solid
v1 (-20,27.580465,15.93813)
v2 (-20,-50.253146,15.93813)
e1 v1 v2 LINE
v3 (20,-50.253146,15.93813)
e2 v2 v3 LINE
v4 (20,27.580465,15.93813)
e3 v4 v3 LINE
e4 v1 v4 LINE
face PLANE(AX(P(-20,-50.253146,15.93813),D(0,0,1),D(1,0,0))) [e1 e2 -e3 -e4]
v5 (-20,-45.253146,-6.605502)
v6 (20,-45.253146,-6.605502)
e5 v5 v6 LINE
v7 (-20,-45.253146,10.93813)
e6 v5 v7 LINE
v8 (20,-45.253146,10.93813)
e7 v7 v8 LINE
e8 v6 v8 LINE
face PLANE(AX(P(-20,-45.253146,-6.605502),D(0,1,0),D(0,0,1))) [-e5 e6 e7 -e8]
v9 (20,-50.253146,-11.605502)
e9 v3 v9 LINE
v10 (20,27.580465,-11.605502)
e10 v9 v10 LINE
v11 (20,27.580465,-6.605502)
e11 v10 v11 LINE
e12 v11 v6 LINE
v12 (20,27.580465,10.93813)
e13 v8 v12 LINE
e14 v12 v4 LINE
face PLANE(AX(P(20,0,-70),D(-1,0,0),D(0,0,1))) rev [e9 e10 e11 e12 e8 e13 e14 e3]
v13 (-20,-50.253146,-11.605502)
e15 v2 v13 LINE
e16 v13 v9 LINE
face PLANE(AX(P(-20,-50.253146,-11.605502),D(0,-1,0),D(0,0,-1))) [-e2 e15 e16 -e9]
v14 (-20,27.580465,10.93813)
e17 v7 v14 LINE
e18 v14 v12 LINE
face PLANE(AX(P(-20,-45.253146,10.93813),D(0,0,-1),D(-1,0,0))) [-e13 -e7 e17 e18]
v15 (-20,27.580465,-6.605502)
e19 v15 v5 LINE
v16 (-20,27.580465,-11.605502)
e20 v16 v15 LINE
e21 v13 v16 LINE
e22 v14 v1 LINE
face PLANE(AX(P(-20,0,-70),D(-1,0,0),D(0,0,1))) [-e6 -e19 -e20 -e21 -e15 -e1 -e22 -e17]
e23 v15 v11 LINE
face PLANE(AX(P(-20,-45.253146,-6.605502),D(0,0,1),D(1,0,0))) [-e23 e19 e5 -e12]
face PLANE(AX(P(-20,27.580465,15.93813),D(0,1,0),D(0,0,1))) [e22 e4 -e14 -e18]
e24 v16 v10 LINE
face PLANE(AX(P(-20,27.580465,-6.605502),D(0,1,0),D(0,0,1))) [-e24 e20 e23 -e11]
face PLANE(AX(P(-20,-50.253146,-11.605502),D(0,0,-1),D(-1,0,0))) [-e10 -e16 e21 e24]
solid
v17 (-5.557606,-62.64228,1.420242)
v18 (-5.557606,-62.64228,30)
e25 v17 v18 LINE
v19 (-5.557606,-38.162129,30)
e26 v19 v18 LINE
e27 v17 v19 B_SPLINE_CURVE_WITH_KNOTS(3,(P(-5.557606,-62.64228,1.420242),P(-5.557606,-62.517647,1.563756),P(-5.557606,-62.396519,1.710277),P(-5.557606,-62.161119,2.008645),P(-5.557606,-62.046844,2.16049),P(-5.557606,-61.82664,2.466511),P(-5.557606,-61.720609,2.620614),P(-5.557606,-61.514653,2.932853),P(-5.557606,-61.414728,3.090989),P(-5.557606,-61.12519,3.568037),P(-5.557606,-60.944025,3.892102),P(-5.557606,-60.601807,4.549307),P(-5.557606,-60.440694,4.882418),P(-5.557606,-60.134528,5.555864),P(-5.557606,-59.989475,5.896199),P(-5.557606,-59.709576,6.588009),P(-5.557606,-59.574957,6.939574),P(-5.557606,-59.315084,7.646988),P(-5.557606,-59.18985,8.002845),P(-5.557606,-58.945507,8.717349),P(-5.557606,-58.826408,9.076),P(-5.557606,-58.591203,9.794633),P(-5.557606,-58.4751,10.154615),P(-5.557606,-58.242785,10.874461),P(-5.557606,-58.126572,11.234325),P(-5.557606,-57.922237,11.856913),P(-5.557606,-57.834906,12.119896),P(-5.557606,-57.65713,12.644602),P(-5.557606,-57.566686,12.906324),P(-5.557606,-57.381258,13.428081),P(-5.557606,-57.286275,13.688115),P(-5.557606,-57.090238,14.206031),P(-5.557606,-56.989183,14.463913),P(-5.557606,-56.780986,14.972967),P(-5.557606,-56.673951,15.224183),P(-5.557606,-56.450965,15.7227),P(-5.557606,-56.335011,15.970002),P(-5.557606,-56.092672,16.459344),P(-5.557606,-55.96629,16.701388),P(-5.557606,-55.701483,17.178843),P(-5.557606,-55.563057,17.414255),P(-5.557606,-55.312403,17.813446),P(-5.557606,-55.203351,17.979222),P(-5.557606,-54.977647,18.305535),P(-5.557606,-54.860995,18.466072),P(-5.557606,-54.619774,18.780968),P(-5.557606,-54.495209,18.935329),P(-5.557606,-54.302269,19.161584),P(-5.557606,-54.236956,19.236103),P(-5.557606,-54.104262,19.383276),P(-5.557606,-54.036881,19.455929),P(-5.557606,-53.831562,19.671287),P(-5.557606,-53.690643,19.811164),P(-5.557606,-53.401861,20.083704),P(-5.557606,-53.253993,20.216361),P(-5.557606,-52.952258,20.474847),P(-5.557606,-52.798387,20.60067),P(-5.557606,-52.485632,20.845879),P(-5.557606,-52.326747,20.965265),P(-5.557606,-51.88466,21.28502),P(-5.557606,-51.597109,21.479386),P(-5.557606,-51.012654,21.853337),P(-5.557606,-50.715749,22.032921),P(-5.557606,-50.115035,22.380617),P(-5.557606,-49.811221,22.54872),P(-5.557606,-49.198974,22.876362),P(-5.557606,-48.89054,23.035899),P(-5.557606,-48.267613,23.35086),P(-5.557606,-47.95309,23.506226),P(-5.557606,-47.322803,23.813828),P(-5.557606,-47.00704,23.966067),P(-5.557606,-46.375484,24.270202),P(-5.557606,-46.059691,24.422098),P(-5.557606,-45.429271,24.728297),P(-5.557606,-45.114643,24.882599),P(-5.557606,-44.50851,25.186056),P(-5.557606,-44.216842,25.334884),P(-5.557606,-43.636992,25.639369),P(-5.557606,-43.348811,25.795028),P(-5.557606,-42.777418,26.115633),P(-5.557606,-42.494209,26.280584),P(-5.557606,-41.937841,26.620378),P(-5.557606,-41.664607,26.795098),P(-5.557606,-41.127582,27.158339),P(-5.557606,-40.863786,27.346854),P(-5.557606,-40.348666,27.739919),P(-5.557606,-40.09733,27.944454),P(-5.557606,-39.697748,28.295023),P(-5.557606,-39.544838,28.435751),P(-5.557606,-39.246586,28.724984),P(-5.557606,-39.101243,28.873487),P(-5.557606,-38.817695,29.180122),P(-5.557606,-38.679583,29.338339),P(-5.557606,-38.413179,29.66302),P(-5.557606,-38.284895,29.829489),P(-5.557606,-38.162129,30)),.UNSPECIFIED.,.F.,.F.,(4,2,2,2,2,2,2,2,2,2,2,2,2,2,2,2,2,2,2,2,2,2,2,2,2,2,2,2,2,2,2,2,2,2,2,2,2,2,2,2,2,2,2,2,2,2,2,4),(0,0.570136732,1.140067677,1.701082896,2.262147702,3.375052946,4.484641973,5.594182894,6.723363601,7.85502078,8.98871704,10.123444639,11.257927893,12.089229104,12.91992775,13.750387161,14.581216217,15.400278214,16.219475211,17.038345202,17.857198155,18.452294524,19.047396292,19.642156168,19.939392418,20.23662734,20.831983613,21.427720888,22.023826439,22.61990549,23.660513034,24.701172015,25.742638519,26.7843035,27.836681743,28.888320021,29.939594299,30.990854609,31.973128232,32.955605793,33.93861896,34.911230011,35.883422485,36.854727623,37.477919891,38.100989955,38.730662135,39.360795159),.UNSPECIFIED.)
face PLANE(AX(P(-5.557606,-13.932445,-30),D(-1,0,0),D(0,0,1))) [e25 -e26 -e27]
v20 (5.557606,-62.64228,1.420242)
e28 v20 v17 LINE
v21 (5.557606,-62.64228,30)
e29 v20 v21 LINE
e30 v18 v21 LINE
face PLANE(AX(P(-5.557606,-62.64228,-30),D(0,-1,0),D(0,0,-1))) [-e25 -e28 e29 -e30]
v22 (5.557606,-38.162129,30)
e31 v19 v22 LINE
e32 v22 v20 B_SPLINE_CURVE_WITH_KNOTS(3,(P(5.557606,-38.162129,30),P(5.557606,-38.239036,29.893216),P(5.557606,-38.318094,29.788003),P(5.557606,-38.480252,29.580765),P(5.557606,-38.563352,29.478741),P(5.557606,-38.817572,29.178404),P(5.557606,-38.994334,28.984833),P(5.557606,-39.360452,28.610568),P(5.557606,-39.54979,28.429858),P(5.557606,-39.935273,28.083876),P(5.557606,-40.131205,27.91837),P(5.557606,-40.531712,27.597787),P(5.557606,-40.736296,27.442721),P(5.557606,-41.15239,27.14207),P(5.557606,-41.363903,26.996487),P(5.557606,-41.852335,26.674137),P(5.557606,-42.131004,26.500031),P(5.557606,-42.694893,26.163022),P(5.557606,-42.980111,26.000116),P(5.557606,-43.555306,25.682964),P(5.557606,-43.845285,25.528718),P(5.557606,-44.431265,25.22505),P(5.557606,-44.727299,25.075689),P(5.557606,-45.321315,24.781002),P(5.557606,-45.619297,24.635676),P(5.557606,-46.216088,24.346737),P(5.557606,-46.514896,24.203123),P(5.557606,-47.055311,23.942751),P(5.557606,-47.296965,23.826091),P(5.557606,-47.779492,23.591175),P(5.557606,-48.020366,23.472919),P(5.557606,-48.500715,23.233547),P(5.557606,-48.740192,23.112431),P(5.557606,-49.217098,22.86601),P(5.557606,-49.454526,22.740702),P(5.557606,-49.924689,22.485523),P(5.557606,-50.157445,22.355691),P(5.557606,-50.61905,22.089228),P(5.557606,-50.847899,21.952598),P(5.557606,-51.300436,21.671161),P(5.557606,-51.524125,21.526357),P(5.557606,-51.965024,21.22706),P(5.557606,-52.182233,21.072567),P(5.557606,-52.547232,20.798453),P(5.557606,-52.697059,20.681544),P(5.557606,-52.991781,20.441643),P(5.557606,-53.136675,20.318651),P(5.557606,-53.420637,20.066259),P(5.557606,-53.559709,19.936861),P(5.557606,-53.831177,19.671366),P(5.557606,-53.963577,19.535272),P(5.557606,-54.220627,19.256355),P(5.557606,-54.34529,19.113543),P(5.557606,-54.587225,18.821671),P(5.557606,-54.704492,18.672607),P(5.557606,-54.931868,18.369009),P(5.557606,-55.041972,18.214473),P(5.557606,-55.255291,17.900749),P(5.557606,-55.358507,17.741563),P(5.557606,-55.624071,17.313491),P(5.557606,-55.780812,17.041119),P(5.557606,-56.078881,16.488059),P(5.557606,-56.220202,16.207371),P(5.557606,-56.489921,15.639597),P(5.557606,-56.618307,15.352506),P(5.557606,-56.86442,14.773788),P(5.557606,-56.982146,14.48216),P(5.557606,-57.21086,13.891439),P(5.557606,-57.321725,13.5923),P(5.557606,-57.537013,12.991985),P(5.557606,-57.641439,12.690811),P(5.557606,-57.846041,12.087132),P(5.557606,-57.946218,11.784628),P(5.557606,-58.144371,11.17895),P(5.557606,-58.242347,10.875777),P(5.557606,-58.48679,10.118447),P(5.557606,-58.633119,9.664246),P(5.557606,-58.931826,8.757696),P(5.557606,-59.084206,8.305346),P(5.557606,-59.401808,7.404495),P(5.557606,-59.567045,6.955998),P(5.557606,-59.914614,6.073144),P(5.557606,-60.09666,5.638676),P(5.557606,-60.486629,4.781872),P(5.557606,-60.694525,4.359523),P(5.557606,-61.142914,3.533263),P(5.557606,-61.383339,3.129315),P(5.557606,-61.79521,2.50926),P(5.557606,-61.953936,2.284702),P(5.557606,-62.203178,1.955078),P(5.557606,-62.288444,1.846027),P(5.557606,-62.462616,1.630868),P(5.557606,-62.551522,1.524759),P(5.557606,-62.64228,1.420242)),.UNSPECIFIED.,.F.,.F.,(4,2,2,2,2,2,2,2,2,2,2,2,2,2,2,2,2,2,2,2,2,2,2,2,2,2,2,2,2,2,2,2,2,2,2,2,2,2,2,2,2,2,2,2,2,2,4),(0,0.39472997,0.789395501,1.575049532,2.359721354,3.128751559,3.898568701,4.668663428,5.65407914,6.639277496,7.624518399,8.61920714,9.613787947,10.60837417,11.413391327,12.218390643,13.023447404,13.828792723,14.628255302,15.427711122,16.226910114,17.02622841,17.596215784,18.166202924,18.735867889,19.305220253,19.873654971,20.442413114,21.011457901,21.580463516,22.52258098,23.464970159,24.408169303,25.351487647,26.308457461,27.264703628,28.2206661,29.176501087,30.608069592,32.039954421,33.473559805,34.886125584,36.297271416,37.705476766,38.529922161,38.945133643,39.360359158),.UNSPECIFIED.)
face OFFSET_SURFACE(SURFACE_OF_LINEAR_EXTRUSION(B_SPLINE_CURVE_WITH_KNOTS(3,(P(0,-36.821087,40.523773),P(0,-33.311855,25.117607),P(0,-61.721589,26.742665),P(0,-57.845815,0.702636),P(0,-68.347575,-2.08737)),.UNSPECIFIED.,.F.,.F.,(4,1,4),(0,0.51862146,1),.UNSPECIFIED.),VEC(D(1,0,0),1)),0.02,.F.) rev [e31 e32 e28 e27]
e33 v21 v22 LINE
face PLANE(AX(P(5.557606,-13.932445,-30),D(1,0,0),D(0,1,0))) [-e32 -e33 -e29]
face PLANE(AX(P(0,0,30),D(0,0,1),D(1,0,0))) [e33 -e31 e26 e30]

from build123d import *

# Parameters (mm, degrees)
EXTRUDE_5_DEPTH      = 30
EXTRUDE_5_DEPTH_BACK = 30
F_1_FR_R             = 5
EXTRUDE_6_DEPTH      = 20
EXTRUDE_6_DEPTH_BACK = 20
OTHER_START          = -15
OTHER_2_DEPTH        = 30


# Read off the part's stored shape, not the designer's step: Отступ2
with BuildPart() as part:
    # Эскиз1_fr → Бобышка-Вытянуть5 (new, two sides: drawn at the far end of the back side and taken through both)
    with BuildSketch(Plane.XY.offset(-EXTRUDE_5_DEPTH_BACK)):
        with BuildLine():
            Line((-5.557606452, -13.932444528), (-5.557606452, -62.642280008))
            Line((-5.557606452, -62.642280008), (5.557606452, -62.642280008))
            Line((5.557606452, -62.642280008), (5.557606452, -13.932444528))
            ThreePointArc((5.557606452, -13.932444528), (0, 15), (-5.557606452, -13.932444528))
        make_face()
        Circle(F_1_FR_R, mode=Mode.SUBTRACT)
    extrude(amount=EXTRUDE_5_DEPTH + EXTRUDE_5_DEPTH_BACK)

    # Отступ2 outline → Отступ2 (cut)
    with BuildSketch(Plane.YZ.offset(OTHER_START)):
        with BuildLine():
            Line((16, 30), (-38.162129208, 30.000000201))
            add(Edge.make_bspline(
                [(-38.162129208, 30.000000201), (-38.350412386, 29.738589195), (-38.547242858, 29.484853366), (-38.752299072, 29.238505312), (-38.965259498, 28.99925828), (-39.185802485, 28.766826159), (-39.413606123, 28.540923423), (-39.64834813, 28.32126501), (-39.889705768, 28.107566173), (-40.137355811, 27.899542297), (-40.39097457, 27.696908743), (-40.650238001, 27.499380765), (-40.914821881, 27.306673579), (-41.184402075, 27.11850268), (-42.265778691, 26.393314992), (-43.113368902, 25.888872388), (-43.99315142, 25.414009108), (-44.896841535, 24.96146191), (-45.816149017, 24.523958449), (-46.742782565, 24.094220219), (-47.668453227, 23.664962906), (-48.584876381, 23.228895124), (-49.483771918, 22.778716473), (-50.356862203, 22.30711592), (-51.195867455, 21.806771428), (-51.992498133, 21.270351842), (-52.73844395, 20.690521946), (-53.511223517, 19.981130426), (-53.596170911, 19.901516083), (-53.680123568, 19.821092243), (-53.763413941, 19.739889031), (-53.844744398, 19.657606996), (-53.927459143, 19.575304006), (-54.004978314, 19.490233908), (-54.086963112, 19.407352212), (-54.162711198, 19.320126258), (-54.240798044, 19.234583034), (-54.316342943, 19.146873901), (-54.391361142, 19.058753339), (-54.465300564, 18.969694587), (-54.611255963, 18.789935065), (-54.683262919, 18.699224485), (-54.754314107, 18.607695324), (-54.824424506, 18.515359819), (-54.893609092, 18.422230207), (-54.961882842, 18.328318725), (-55.029260732, 18.233637612), (-55.095757741, 18.138199104), (-55.161388843, 18.042015438), (-55.226169019, 17.945098853), (-55.290113242, 17.847461585), (-55.353236491, 17.749115872), (-55.415553743, 17.650073952), (-55.600132437, 17.350896278), (-55.720020886, 17.148708437), (-55.836865309, 16.943882089), (-55.950785669, 16.736514739), (-56.061901911, 16.526703843), (-56.170333957, 16.31454681), (-56.276201707, 16.100141), (-56.379625042, 15.883583727), (-56.480723817, 15.664972254), (-56.579617872, 15.444403799), (-56.676427019, 15.221975529), (-56.771271052, 14.997784566), (-56.864269745, 14.771927983), (-57.138089051, 14.089652446), (-57.313732951, 13.628528404), (-57.48343208, 13.161907014), (-57.648143574, 12.690564713), (-57.808824172, 12.215278032), (-57.966430218, 11.736823601), (-58.121917654, 11.255978148), (-58.276242029, 10.773518498), (-58.430358494, 10.290221572), (-58.585221804, 9.806864391), (-58.741786314, 9.324224071), (-58.901005985, 8.843077827), (-59.063834379, 8.364202972), (-59.410471901, 7.378846098), (-59.594949774, 6.872811052), (-59.785830162, 6.371227061), (-59.984282319, 5.875048562), (-60.19147505, 5.385229705), (-60.408577178, 4.902724584), (-60.636757277, 4.428487146), (-60.877183329, 3.963470844), (-61.131022629, 3.508628159), (-61.399442059, 3.064910118), (-61.683608675, 2.633265954), (-61.984690452, 2.214643016), (-62.303856996, 1.809986968), (-62.642280061, 1.420242276)],
                knots=[0.165052435, 0.165052435, 0.165052435, 0.165052435, 0.165052435, 0.165052435, 0.165052435, 0.165052435, 0.165052435, 0.165052435, 0.165052435, 0.165052435, 0.165052435, 0.165052435, 0.165052435, 0.25, 0.25, 0.25, 0.25, 0.25, 0.25, 0.25, 0.25, 0.25, 0.25, 0.25, 0.25, 0.25, 0.5, 0.5, 0.5, 0.5, 0.5, 0.5, 0.5, 0.5, 0.5, 0.5, 0.5, 0.5, 0.5, 0.53125, 0.53125, 0.53125, 0.53125, 0.53125, 0.53125, 0.53125, 0.53125, 0.53125, 0.53125, 0.53125, 0.53125, 0.53125, 0.5625, 0.5625, 0.5625, 0.5625, 0.5625, 0.5625, 0.5625, 0.5625, 0.5625, 0.5625, 0.5625, 0.5625, 0.5625, 0.625, 0.625, 0.625, 0.625, 0.625, 0.625, 0.625, 0.625, 0.625, 0.625, 0.625, 0.625, 0.625, 0.75, 0.75, 0.75, 0.75, 0.75, 0.75, 0.75, 0.75, 0.75, 0.75, 0.75, 0.75, 0.75, 0.883854275, 0.883854275, 0.883854275, 0.883854275, 0.883854275, 0.883854275, 0.883854275, 0.883854275, 0.883854275, 0.883854275, 0.883854275, 0.883854275, 0.883854275, 0.883854275, 0.883854275], degree=14))
            Line((-62.642280061, 1.420242276), (-62.642280008, -30))
            Line((-62.642280008, -30), (16, -30))
            Line((16, -30), (16, 30))
        make_face()
    extrude(amount=OTHER_2_DEPTH, mode=Mode.SUBTRACT)


with BuildPart() as body_2:
    # Эскиз3 → Бобышка-Вытянуть6 (new, two sides: drawn at the far end of the back side and taken through both)
    with BuildSketch(Plane(origin=(0, 0, 0), x_dir=(0, 0, -1), z_dir=(1, 0, 0)).offset(-EXTRUDE_6_DEPTH_BACK)):
        Polygon((-58.394498043, -50.25314581), (-85.938130262, -50.25314581), (-85.938130262, 27.580465306), (-80.938130262, 27.580465306), (-80.938130262, -45.25314581), (-63.394498043, -45.25314581), (-63.394498043, 27.580465306), (-58.394498043, 27.580465306), align=None)
    extrude(amount=EXTRUDE_6_DEPTH + EXTRUDE_6_DEPTH_BACK)


with BuildPart() as body_2_1:
    # Move Body 1: moved
    add(body_2.part.moved(Location((0, 0, -70))))


solid = Compound([part.part, body_2_1.part])
